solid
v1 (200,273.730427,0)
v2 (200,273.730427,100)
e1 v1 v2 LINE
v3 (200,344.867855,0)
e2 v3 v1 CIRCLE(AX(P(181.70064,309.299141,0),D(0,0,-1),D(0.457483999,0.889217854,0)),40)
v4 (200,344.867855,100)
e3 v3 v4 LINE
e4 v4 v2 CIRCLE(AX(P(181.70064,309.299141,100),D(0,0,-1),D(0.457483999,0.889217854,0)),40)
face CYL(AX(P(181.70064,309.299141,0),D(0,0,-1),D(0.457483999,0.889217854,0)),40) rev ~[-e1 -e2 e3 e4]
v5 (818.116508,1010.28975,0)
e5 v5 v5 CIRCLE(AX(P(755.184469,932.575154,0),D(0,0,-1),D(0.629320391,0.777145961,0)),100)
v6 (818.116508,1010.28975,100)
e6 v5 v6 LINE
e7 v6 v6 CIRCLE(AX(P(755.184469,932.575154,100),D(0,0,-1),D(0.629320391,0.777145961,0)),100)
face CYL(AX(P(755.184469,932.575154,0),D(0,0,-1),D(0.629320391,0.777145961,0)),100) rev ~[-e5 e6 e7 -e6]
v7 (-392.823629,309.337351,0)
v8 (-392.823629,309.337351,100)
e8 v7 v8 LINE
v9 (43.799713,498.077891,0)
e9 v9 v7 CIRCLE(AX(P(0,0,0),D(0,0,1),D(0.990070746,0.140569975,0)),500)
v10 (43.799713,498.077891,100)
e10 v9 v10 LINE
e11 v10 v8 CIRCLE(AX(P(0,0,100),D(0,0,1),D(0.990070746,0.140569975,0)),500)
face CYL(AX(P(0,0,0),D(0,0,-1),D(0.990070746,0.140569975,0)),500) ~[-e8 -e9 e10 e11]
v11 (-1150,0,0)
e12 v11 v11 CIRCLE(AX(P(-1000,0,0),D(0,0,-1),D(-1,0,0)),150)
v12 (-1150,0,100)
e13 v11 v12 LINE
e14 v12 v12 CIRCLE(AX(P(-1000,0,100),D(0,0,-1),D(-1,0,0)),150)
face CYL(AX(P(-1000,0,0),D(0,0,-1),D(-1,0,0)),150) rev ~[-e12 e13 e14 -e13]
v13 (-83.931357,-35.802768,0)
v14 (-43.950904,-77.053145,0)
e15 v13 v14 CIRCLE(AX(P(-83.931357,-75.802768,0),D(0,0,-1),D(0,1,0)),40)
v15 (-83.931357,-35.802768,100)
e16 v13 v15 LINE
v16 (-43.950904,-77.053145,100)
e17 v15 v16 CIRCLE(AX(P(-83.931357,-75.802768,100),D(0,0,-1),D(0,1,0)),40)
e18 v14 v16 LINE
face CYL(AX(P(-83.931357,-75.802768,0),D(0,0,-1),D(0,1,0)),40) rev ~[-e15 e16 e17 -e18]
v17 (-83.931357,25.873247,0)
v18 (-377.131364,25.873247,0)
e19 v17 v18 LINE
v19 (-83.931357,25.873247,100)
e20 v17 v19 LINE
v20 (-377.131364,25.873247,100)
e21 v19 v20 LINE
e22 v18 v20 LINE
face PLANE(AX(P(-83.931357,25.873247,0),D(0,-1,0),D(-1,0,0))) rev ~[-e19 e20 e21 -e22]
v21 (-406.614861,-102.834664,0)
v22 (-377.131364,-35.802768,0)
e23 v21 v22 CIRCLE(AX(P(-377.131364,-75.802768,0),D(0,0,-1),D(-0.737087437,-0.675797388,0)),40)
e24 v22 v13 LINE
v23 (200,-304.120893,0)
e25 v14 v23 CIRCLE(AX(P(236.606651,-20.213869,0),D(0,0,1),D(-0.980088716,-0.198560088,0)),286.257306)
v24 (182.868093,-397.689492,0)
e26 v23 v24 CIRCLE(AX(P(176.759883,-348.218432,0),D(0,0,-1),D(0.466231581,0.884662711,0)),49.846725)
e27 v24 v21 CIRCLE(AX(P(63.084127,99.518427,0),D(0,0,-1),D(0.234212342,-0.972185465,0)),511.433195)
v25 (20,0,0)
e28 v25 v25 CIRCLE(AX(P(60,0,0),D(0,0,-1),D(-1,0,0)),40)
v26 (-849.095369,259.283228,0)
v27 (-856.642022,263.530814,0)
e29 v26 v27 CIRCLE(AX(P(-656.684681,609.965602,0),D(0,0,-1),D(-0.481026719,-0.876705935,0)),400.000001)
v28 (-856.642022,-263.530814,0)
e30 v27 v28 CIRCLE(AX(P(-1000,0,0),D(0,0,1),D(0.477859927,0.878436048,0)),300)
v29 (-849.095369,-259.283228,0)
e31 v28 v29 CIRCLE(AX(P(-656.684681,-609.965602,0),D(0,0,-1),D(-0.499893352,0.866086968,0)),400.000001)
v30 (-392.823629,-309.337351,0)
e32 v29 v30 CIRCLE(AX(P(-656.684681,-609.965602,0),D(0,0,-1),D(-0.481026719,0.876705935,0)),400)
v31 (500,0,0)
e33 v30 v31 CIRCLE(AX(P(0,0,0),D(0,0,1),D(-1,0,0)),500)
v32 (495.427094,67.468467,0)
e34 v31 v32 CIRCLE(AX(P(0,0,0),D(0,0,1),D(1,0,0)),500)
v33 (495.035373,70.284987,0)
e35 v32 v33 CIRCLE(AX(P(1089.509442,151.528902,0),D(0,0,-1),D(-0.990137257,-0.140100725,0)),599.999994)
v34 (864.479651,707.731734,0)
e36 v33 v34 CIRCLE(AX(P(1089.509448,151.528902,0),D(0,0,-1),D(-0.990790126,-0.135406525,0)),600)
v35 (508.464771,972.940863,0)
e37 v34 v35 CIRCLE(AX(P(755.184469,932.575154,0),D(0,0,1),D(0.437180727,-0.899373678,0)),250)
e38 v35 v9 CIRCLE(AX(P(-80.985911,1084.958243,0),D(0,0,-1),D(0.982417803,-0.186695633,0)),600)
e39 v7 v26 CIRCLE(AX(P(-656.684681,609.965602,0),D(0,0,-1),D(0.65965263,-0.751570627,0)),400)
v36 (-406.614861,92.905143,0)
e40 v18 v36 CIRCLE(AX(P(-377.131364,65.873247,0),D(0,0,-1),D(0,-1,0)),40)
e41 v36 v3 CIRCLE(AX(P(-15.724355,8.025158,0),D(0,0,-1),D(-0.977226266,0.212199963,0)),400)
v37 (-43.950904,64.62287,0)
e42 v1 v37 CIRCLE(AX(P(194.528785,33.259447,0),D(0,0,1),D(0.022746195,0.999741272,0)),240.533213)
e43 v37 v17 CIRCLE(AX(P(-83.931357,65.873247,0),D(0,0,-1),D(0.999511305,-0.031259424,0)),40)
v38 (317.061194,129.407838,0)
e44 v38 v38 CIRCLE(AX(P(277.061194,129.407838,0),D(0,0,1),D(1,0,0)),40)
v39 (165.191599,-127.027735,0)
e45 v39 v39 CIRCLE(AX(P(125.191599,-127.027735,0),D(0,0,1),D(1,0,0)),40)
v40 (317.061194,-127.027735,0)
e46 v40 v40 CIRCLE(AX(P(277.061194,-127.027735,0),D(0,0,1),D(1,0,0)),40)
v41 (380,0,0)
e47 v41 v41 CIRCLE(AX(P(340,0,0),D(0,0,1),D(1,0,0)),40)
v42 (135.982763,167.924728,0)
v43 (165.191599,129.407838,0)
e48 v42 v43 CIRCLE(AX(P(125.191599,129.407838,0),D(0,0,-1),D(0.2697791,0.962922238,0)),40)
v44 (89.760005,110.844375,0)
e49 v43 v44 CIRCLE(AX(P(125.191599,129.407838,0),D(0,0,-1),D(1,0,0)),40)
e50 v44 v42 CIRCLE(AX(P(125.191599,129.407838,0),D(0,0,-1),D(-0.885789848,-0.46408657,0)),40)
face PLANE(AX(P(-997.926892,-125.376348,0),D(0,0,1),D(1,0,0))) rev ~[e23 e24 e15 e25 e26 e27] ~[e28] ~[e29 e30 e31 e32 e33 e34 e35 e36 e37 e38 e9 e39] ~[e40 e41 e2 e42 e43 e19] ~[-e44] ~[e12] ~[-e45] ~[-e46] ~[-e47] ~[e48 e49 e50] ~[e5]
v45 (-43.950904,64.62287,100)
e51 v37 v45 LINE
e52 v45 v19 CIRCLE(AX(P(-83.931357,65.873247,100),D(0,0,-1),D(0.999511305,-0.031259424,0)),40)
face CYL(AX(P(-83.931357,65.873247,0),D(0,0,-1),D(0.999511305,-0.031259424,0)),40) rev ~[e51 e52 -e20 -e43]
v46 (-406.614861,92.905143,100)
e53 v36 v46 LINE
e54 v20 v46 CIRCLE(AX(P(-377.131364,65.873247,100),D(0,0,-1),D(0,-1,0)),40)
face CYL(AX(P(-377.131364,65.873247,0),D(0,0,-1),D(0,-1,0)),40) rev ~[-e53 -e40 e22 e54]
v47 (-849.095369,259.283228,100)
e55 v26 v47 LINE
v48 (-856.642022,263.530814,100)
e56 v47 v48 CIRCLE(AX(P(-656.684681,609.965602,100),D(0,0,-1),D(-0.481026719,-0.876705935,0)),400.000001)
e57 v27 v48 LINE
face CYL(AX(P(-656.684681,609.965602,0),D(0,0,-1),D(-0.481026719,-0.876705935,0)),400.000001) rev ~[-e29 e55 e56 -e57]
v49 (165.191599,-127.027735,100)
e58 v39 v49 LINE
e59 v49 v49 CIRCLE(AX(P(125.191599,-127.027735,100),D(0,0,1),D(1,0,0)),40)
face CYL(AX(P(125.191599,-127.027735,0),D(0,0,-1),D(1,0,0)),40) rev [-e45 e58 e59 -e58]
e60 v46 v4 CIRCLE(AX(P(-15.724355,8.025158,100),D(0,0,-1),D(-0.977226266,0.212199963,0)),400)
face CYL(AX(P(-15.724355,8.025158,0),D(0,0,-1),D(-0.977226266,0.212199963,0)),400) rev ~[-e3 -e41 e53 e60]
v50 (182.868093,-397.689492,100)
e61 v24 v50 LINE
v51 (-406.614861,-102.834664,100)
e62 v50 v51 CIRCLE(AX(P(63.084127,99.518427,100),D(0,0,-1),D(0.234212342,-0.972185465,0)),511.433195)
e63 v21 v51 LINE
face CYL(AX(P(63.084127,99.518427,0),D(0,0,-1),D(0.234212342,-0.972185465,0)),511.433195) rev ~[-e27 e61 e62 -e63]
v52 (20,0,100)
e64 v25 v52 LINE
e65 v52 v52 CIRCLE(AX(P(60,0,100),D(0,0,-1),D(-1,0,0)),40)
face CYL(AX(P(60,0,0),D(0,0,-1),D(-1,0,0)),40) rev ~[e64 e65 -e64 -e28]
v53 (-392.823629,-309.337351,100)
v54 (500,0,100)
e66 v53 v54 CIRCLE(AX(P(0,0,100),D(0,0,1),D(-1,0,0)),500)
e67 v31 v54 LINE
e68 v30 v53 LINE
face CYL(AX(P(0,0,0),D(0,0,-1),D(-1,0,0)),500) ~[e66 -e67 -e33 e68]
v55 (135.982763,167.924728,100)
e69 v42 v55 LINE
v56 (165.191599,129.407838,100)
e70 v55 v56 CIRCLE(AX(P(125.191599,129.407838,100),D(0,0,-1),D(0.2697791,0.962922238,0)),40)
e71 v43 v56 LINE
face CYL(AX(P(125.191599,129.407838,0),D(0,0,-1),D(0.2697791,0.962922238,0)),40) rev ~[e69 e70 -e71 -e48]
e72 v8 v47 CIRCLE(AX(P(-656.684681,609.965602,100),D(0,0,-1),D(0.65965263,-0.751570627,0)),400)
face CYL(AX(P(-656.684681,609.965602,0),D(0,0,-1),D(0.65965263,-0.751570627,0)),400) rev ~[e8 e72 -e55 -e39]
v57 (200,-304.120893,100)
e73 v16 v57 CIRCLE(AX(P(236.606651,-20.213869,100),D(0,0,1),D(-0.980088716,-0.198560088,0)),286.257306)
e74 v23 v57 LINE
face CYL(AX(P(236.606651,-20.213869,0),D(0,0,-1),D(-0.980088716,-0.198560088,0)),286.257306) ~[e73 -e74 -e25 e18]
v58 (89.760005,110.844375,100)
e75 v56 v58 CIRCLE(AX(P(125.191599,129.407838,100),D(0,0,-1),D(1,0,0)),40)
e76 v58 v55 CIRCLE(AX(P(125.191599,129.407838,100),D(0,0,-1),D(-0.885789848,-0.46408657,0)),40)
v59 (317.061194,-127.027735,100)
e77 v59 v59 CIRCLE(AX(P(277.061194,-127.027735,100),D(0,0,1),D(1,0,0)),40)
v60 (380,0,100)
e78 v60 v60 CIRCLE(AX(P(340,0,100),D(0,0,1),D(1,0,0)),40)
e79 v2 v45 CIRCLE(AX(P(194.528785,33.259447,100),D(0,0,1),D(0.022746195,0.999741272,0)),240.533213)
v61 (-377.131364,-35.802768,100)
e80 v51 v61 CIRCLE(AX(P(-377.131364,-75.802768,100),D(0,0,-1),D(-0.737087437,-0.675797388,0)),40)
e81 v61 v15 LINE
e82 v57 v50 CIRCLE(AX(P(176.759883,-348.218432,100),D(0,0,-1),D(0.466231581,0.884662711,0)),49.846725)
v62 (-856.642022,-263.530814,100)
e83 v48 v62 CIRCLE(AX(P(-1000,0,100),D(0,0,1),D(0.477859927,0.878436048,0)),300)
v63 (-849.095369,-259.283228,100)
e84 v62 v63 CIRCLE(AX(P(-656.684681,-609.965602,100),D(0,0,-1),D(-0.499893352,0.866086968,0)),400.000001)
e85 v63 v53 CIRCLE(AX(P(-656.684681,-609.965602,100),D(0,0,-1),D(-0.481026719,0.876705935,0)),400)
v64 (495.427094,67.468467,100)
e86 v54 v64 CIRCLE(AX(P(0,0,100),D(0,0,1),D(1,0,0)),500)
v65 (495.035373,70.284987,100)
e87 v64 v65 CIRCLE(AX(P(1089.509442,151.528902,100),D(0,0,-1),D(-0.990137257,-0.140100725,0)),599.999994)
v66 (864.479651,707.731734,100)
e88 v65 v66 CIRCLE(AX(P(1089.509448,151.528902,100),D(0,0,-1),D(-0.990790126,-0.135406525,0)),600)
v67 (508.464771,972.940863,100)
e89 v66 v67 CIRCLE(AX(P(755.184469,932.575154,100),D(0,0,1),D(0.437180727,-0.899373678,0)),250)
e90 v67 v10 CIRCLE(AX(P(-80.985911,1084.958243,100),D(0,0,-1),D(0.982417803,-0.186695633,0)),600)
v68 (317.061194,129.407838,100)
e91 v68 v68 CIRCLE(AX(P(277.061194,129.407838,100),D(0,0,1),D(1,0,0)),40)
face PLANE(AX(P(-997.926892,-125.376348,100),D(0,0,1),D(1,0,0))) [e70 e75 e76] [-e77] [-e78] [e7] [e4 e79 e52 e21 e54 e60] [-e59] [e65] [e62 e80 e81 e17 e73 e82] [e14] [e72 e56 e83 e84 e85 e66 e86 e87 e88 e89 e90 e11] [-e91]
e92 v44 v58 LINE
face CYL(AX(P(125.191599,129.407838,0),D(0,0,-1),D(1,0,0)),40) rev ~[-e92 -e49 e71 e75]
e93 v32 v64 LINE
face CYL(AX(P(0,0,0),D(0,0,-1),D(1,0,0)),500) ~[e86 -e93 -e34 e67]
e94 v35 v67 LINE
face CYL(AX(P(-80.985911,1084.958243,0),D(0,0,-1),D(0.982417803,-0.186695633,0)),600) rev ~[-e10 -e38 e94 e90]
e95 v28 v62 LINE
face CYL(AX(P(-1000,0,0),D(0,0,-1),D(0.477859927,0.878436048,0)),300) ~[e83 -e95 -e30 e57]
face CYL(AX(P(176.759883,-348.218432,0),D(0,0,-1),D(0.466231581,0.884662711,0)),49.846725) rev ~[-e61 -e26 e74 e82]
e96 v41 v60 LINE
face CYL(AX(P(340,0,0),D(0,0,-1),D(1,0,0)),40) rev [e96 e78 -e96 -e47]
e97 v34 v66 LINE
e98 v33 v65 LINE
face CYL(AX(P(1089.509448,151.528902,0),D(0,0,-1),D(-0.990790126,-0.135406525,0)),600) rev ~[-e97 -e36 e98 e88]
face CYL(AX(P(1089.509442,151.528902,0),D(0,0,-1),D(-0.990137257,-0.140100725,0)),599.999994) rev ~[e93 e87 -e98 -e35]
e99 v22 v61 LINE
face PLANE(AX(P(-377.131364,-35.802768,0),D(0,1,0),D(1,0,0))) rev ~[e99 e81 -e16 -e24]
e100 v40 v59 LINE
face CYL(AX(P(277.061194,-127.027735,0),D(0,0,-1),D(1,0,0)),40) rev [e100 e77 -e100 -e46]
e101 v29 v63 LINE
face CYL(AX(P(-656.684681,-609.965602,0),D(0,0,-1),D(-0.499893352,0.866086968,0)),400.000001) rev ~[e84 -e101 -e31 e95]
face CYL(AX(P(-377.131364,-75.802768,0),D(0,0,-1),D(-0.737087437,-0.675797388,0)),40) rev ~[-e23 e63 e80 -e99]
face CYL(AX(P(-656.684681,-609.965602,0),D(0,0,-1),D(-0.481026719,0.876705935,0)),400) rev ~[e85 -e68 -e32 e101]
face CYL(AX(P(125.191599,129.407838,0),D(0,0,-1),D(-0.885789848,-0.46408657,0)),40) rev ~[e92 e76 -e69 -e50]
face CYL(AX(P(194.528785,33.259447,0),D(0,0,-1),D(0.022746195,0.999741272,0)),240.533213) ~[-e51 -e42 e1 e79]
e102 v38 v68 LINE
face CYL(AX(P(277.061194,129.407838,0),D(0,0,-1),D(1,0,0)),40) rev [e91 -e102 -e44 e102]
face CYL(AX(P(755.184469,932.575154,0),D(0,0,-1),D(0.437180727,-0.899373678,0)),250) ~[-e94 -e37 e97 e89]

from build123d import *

# Parameters (mm, degrees)
F0_R     = 40
F1_DEPTH = 100


with BuildPart() as f1:
    # F0 (on Top) → F1 (new body)
    with BuildSketch(Plane.XY):
        with BuildLine():
            ThreePointArc((-849.0953685383, -259.2832277711), (-739.9313653682, -149.5470002399), (-700, 0))
            Line((-700, 0), (-850, 0))
            ThreePointArc((-850, 0), (-1000, -150), (-1150, 0))
            Line((-1150, 0), (-1300, 0))
            ThreePointArc((-1300, 0), (-1153.2850393406, -257.8831066867), (-856.6420219043, -263.5308143582))
            ThreePointArc((-856.6420219043, -263.5308143582), (-852.8801904642, -261.3865975578), (-849.0953685383, -259.2832277711))
        make_face()
        with BuildLine():
            ThreePointArc((-849.0953685383, 259.2832277711), (-739.9313653682, 149.5470002399), (-700, 0))
            Line((-700, 0), (-500, 0))
            ThreePointArc((-500, 0), (-472.4467242206, 163.6890123778), (-392.8236289072, 309.3373507551))
            ThreePointArc((-392.8236289072, 309.3373507551), (-613.0653910459, 212.3510174227), (-849.0953685383, 259.2832277711))
        make_face()
        with BuildLine():
            Line((-850, 0), (-700, 0))
            ThreePointArc((-700, 0), (-739.9313653682, 149.5470002399), (-849.0953685383, 259.2832277711))
            ThreePointArc((-849.0953685383, 259.2832277711), (-852.8801904642, 261.3865975578), (-856.6420219043, 263.5308143582))
            ThreePointArc((-856.6420219043, 263.5308143582), (-1153.2850393406, 257.8831066867), (-1300, 0))
            Line((-1300, 0), (-1150, 0))
            ThreePointArc((-1150, 0), (-1000, 150), (-850, 0))
        make_face()
        with BuildLine():
            Line((-500, 0), (-700, 0))
            ThreePointArc((-700, 0), (-739.9313653682, -149.5470002399), (-849.0953685383, -259.2832277711))
            ThreePointArc((-849.0953685383, -259.2832277711), (-613.0653910459, -212.3510174227), (-392.8236289072, -309.3373507551))
            ThreePointArc((-392.8236289072, -309.3373507551), (-472.4467242206, -163.6890123778), (-500, 0))
        make_face()
        with BuildLine():
            ThreePointArc((-392.8236289072, 309.3373507551), (-472.4467242206, 163.6890123778), (-500, 0))
            Line((-500, 0), (-20, 0))
            ThreePointArc((-20, 0), (36.5716696241, 147.2792613729), (177.1925530051, 218.8145798652))
            Line((177.1925530051, 218.8145798652), (314.6601955249, 388.5729807285))
            ThreePointArc((314.6601955249, 388.5729807285), (187.4065310938, 463.5502045123), (43.7997133909, 498.0778906023))
            ThreePointArc((43.7997133909, 498.0778906023), (-198.3939798634, 458.9551489568), (-392.8236289072, 309.3373507551))
        make_face()
        with BuildLine():
            ThreePointArc((-406.6148611623, 92.9051428836), (-169.1586966122, 377.4272459242), (200, 344.8678553104))
            ThreePointArc((200, 344.8678553104), (221.7006400578, 309.2991411686), (200, 273.7304270267))
            ThreePointArc((200, 273.7304270267), (37.9889182283, 215.8833684246), (-43.9509044765, 64.6228704059))
            ThreePointArc((-43.9509044765, 64.6228704059), (-56.0926702606, 37.1503028891), (-83.9313566685, 25.8732473601))
            Line((-83.9313566685, 25.8732473601), (-377.1313636694, 25.8732473601))
            ThreePointArc((-377.1313636694, 25.8732473601), (-413.7460862611, 49.7685247754), (-406.6148611623, 92.9051428836))
        make_face(mode=Mode.SUBTRACT)
        with BuildLine():
            Line((-20, 0), (-500, 0))
            ThreePointArc((-500, 0), (-472.4467242206, -163.6890123778), (-392.8236289072, -309.3373507551))
            ThreePointArc((-392.8236289072, -309.3373507551), (163.6890123778, -472.4467242206), (500, 0))
            ThreePointArc((500, 0), (498.8554636471, 33.8116309782), (495.4270944424, 67.4684673932))
            ThreePointArc((495.4270944424, 67.4684673932), (495.2295651607, 68.8764953304), (495.0353730255, 70.2849873978))
            ThreePointArc((495.0353730255, 70.2849873978), (435.0040690697, 246.5186806164), (314.6601955249, 388.5729807285))
            Line((314.6601955249, 388.5729807285), (177.1925530051, 218.8145798652))
            ThreePointArc((177.1925530051, 218.8145798652), (347.2792613729, 163.4283303759), (420, 0))
            ThreePointArc((420, 0), (200, -220), (-20, 0))
        make_face()
        with BuildLine():
            ThreePointArc((-406.6148611623, -102.8346635677), (-413.7460862611, -59.6980454595), (-377.1313636694, -35.8027680442))
            Line((-377.1313636694, -35.8027680442), (-83.9313566685, -35.8027680442))
            ThreePointArc((-83.9313566685, -35.8027680442), (-55.2084121975, -47.9640816364), (-43.9509044765, -77.0531449985))
            ThreePointArc((-43.9509044765, -77.0531449985), (41.5727461521, -229.7491196269), (200, -304.1208933235))
            ThreePointArc((200, -304.1208933235), (225.7915227703, -357.1958613892), (182.8680932522, -397.6894915104))
            ThreePointArc((182.8680932522, -397.6894915104), (-165.7061110263, -357.8861419627), (-406.6148611623, -102.8346635677))
        make_face(mode=Mode.SUBTRACT)
        with BuildLine():
            ThreePointArc((177.1925530051, 218.8145798652), (36.5716696241, 147.2792613729), (-20, 0))
            Line((-20, 0), (0, 0))
            Line((0, 0), (89.7600051949, 110.8443751857))
            ThreePointArc((89.7600051949, 110.8443751857), (94.1057606724, 154.5806536289), (135.9827631274, 167.9247275238))
            Line((135.9827631274, 167.9247275238), (177.1925530051, 218.8145798652))
        make_face()
        with BuildLine():
            Line((0, 0), (-20, 0))
            ThreePointArc((-20, 0), (200, -220), (420, 0))
            ThreePointArc((420, 0), (347.2792613729, 163.4283303759), (177.1925530051, 218.8145798652))
            Line((177.1925530051, 218.8145798652), (135.9827631274, 167.9247275238))
            ThreePointArc((135.9827631274, 167.9247275238), (157.0635818103, 153.5775860217), (165.1915991306, 129.4078379869))
            ThreePointArc((165.1915991306, 129.4078379869), (134.750266469, 90.5667273088), (89.7600051949, 110.8443751857))
            Line((89.7600051949, 110.8443751857), (0, 0))
        make_face()
        with Locations((125.1915991306, -127.0277351141)):
            Circle(F0_R, mode=Mode.SUBTRACT)
        with Locations((277.0611941814, -127.0277351141)):
            Circle(F0_R, mode=Mode.SUBTRACT)
        with BuildLine():
            ThreePointArc((100, 0), (60, -40), (20, 0))
            ThreePointArc((20, 0), (60, 40), (100, 0))
        make_face(mode=Mode.SUBTRACT)
        with Locations((340, 0)):
            Circle(F0_R, mode=Mode.SUBTRACT)
        with Locations((277.0611941814, 129.4078379869)):
            Circle(F0_R, mode=Mode.SUBTRACT)
        with BuildLine():
            ThreePointArc((508.4647709692, 972.9408629012), (347.8579835974, 665.3239807328), (43.7997133909, 498.0778906023))
            ThreePointArc((43.7997133909, 498.0778906023), (187.4065310938, 463.5502045123), (314.6601955249, 388.5729807285))
            Line((314.6601955249, 388.5729807285), (597.8543714973, 738.2886633841))
            ThreePointArc((597.8543714973, 738.2886633841), (521.5619679737, 843.5778116935), (508.4647709692, 972.9408629012))
        make_face()
        with BuildLine():
            Line((597.8543714973, 738.2886633841), (314.6601955249, 388.5729807285))
            ThreePointArc((314.6601955249, 388.5729807285), (435.0040690697, 246.5186806164), (495.0353730255, 70.2849873978))
            ThreePointArc((495.0353730255, 70.2849873978), (564.4809221518, 441.9510892686), (842.4187636125, 698.2886242833))
            ThreePointArc((842.4187636125, 698.2886242833), (714.8315735034, 685.8533594049), (597.8543714973, 738.2886633841))
        make_face()
        with BuildLine():
            ThreePointArc((1005.1844692598, 932.5751537484), (775.4338572426, 1181.7537288433), (508.4647709692, 972.9408629012))
            ThreePointArc((508.4647709692, 972.9408629012), (521.5619679737, 843.5778116935), (597.8543714973, 738.2886633841))
            ThreePointArc((597.8543714973, 738.2886633841), (714.8315735034, 685.8533594049), (842.4187636125, 698.2886242833))
            ThreePointArc((842.4187636125, 698.2886242833), (853.4019929681, 703.1204808996), (864.4796509854, 707.7317343393))
            ThreePointArc((864.4796509854, 707.7317343393), (967.1087428004, 799.9550109182), (1005.1844692598, 932.5751537484))
        make_face()
        with BuildLine():
            ThreePointArc((855.1844692598, 932.5751537484), (798.2355789406, 842.3166253134), (692.2524301548, 854.8605576027))
            ThreePointArc((692.2524301548, 854.8605576027), (677.4698731141, 995.5071928533), (818.1165083648, 1010.2897498941))
            ThreePointArc((818.1165083648, 1010.2897498941), (845.4429976948, 975.6262634292), (855.1844692598, 932.5751537484))
        make_face(mode=Mode.SUBTRACT)
    extrude(amount=F1_DEPTH)


solid = f1.part
